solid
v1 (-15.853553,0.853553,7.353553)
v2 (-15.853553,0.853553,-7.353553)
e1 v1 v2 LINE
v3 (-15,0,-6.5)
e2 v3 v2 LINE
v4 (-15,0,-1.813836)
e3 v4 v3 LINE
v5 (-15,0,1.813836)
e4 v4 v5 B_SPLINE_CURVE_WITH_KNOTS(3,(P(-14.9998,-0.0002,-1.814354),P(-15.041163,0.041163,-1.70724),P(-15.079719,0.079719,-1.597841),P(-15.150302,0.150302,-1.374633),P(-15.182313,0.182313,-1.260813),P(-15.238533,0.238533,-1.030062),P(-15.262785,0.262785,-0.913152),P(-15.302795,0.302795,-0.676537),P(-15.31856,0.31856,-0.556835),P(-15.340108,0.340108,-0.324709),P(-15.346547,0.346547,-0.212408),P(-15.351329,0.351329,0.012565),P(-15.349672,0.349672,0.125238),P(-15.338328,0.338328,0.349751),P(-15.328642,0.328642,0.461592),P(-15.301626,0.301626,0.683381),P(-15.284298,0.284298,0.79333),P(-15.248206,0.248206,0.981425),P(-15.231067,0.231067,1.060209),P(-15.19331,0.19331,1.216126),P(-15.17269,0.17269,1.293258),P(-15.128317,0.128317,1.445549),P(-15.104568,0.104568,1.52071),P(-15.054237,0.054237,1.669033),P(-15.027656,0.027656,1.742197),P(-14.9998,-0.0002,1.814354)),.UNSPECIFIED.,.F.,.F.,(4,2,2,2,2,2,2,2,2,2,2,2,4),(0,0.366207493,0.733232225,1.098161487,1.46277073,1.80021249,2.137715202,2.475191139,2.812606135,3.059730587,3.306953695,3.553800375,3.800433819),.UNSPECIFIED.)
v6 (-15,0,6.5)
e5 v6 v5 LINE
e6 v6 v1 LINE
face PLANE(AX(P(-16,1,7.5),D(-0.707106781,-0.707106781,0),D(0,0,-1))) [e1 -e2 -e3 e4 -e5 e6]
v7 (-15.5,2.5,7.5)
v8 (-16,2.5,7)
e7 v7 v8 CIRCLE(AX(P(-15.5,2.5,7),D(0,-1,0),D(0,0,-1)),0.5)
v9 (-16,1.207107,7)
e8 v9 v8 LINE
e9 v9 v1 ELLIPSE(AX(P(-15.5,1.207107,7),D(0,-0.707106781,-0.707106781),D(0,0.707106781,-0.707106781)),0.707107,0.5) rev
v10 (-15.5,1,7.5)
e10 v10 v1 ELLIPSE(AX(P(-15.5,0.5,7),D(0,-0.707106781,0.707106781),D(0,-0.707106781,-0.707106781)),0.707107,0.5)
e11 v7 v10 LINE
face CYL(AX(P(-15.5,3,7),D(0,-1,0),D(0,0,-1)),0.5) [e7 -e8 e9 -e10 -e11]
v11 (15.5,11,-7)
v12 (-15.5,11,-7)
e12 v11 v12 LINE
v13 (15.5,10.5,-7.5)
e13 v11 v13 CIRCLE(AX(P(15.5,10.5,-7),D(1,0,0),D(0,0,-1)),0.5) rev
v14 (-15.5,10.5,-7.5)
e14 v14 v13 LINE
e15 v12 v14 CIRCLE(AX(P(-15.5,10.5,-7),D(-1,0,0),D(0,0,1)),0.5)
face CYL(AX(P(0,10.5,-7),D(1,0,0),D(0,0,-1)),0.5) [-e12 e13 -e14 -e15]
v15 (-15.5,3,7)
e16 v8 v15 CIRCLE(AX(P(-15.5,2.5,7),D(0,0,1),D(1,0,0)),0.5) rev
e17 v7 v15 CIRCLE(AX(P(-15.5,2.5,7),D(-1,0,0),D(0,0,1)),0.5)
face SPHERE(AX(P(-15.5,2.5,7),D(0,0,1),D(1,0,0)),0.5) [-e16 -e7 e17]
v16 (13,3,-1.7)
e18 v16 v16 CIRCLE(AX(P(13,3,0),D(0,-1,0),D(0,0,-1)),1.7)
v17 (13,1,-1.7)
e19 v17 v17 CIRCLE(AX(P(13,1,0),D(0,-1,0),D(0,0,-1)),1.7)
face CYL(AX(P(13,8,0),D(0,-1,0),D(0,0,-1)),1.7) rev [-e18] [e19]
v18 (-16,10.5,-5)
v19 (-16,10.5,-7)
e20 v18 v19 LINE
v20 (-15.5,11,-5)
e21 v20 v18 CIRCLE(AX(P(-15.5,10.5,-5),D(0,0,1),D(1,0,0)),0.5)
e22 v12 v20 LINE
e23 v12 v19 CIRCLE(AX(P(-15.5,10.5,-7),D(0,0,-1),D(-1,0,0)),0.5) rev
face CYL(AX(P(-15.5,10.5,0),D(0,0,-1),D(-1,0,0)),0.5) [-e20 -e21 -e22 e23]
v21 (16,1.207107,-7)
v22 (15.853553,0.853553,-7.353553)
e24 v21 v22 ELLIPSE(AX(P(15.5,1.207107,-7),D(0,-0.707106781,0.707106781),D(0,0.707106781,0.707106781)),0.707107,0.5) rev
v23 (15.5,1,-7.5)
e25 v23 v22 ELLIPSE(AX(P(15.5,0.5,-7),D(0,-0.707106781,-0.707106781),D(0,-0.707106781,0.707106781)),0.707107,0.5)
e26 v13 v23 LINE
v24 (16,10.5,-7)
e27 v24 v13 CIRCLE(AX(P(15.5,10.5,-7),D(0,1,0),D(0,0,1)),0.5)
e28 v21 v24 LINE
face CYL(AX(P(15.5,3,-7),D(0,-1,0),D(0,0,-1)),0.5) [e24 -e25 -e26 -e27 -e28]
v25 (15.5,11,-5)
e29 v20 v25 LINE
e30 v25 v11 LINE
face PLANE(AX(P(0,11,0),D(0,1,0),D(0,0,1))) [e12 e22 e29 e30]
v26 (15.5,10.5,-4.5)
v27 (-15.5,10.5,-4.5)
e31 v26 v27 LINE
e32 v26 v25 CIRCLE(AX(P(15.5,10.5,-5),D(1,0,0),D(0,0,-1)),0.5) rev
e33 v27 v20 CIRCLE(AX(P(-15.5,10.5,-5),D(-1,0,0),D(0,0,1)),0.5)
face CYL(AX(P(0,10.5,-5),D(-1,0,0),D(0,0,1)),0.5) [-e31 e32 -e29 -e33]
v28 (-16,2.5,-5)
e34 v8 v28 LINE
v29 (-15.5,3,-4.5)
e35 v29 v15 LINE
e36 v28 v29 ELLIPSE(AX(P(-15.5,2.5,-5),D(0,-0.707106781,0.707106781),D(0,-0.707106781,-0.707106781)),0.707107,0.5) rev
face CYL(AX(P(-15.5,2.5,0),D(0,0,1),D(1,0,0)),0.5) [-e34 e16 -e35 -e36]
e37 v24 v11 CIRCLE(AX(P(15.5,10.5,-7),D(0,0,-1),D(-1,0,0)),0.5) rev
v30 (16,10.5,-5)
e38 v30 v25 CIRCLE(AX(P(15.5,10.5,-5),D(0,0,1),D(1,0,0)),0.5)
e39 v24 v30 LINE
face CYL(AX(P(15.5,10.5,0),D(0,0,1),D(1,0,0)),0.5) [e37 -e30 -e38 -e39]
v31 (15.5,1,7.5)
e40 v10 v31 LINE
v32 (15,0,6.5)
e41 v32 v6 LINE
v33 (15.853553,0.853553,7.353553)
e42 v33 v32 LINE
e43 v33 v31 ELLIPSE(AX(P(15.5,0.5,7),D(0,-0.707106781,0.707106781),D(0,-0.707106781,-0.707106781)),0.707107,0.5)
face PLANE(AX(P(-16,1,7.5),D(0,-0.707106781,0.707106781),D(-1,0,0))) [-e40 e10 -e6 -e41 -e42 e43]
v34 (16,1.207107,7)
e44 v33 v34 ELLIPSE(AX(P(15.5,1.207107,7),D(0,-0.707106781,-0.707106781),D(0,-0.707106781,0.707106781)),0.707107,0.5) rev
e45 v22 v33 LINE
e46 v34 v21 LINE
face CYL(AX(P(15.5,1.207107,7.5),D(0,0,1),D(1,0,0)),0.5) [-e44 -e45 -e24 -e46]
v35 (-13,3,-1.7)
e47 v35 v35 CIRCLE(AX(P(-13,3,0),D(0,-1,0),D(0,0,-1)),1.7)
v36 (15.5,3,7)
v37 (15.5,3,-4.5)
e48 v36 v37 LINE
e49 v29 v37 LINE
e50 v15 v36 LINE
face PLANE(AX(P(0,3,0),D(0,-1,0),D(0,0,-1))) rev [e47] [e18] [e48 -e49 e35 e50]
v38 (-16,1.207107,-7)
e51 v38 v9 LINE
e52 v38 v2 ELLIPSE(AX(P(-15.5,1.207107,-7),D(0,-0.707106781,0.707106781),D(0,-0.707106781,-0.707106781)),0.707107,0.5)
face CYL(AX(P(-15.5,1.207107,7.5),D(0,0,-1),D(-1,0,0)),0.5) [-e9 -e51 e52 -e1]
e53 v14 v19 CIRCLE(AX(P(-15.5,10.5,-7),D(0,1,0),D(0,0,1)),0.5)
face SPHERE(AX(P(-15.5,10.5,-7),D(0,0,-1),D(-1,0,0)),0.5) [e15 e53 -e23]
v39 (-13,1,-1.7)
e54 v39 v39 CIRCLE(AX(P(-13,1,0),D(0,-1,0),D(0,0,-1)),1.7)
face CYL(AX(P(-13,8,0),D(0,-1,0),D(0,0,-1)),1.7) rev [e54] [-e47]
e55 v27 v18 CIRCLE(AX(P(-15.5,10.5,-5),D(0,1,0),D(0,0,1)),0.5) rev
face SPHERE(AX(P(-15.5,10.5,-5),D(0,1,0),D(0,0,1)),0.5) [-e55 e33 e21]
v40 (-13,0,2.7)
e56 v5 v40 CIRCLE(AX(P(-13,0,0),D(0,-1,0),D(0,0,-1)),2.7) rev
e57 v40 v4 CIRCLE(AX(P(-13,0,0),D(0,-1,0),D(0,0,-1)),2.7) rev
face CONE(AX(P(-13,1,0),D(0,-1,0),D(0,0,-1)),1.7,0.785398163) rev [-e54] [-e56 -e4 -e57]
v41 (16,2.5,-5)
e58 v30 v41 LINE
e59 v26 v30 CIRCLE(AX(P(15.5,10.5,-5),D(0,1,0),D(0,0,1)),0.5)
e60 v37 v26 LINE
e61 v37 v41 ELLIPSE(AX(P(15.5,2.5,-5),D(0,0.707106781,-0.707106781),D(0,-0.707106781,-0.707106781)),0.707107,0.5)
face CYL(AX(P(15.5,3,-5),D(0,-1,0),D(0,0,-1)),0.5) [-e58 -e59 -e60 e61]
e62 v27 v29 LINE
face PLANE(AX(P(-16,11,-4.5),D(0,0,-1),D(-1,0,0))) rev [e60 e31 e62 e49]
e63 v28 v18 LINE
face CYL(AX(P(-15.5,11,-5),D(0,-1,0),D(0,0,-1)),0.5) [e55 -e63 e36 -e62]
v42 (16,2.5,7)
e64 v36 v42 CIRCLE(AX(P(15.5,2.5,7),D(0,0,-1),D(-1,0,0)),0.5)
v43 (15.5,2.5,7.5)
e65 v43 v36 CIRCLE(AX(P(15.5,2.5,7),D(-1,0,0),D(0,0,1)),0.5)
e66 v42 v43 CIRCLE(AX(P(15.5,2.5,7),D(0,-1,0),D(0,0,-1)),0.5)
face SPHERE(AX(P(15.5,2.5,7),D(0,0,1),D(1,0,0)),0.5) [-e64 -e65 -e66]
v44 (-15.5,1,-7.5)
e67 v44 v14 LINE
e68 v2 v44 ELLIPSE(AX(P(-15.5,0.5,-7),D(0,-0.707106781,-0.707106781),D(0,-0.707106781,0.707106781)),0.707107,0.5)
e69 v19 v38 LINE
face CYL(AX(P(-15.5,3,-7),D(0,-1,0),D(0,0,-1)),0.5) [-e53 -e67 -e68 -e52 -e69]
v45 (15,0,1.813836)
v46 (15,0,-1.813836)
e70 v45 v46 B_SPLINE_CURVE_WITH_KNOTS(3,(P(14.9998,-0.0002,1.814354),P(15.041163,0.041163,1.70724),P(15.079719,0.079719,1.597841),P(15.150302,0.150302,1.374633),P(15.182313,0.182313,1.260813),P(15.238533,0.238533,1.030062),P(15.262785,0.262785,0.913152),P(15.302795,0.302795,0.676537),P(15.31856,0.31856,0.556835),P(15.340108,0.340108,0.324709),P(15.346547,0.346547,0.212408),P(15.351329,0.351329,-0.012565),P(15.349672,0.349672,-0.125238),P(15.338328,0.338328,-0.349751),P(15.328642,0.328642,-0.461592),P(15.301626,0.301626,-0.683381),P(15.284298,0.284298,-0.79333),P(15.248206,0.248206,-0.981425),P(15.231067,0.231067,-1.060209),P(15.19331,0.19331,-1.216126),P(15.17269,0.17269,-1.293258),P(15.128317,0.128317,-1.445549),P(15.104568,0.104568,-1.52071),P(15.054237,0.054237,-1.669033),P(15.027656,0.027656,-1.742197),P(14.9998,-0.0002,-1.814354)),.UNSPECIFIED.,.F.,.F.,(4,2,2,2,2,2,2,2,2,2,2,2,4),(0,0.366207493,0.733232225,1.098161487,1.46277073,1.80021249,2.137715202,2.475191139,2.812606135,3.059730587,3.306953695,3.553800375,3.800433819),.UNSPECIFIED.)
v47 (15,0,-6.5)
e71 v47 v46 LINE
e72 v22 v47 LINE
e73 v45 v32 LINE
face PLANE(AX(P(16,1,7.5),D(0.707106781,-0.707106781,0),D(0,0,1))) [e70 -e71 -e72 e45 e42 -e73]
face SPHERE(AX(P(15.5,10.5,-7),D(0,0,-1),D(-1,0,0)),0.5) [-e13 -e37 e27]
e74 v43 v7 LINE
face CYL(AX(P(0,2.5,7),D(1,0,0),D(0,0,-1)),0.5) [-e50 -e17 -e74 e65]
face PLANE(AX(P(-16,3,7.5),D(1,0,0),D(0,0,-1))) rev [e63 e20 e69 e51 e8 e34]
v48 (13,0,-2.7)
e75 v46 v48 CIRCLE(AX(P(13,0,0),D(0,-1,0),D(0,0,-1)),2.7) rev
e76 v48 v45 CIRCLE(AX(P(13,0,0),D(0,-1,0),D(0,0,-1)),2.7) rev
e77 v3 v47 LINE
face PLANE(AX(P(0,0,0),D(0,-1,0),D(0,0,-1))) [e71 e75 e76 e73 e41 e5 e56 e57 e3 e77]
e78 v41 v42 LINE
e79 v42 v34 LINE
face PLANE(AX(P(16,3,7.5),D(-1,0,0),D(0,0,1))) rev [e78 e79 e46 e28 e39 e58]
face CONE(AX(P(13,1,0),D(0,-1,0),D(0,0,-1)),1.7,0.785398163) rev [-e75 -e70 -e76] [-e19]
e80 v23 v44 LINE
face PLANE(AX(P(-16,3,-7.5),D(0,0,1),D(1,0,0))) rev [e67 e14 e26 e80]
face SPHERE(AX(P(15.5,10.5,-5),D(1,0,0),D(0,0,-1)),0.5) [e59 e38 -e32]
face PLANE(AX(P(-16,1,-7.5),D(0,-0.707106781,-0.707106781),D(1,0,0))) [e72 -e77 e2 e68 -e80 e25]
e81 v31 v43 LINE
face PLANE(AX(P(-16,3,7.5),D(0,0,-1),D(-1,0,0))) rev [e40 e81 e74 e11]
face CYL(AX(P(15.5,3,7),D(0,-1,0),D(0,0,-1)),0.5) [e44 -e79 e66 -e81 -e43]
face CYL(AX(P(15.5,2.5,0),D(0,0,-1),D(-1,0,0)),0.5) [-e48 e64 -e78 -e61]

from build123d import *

# Parameters (mm, degrees)
SKETCH_1_W          = 32
SKETCH_1_H          = 15
EXTRUDE_1_DEPTH     = 3
SKETCH_2_W          = 32
SKETCH_2_H          = 3
EXTRUDE_2_DEPTH     = 8
SKETCH_3_R          = 1.7
CUT_EXTRUDE_1_DEPTH = 8
CHAMFER_1_SIZE      = 1
FILLET_1_R          = 0.5
FILLET_2_R          = 0.5


with BuildPart() as part:
    # Эскиз1 → Бобышка-Вытянуть1 (new body)
    with BuildSketch(Plane(origin=(0, 0, 0), x_dir=(1, 0, 0), z_dir=(0, 1, 0))):
        Rectangle(SKETCH_1_W, SKETCH_1_H)
    extrude(amount=EXTRUDE_1_DEPTH)

    # Эскиз2 → Бобышка-Вытянуть2 (add)
    with BuildSketch(Plane(origin=(0, 3, 0), x_dir=(1, 0, 0), z_dir=(0, 1, 0))):
        with Locations((0, 6)):
            Rectangle(SKETCH_2_W, SKETCH_2_H)
    extrude(amount=EXTRUDE_2_DEPTH)

    # Эскиз3 → Вырез-Вытянуть1 (cut)
    with BuildSketch(Plane.XZ):
        with Locations(Location((13, 0, 0), (0, 0, 270))):
            Circle(SKETCH_3_R)
        with Locations(Location((-13, 0, 0), (0, 0, 270))):
            Circle(SKETCH_3_R)
    extrude(amount=-CUT_EXTRUDE_1_DEPTH, mode=Mode.SUBTRACT)

    # Фаска1
    # the kernel refuses this chamfer: 1 mm, written as the material it takes off along each edge
    with BuildSketch(Plane(origin=(13, 0, 0), x_dir=(0, 0, -1), z_dir=(-1, 0, 0))) as chamfer_1_piece_1:
        Polygon((1.7 + CHAMFER_1_SIZE, 0), (1.7, -CHAMFER_1_SIZE), (1.7, 0), align=None)
    revolve(axis=Axis((13, 0, 0), (0, -1, 0)), mode=Mode.SUBTRACT)
    with BuildSketch(Plane(origin=(-13, 0, 0), x_dir=(0, 0, -1), z_dir=(-1, 0, 0))) as chamfer_1_piece_2:
        Polygon((1.7 + CHAMFER_1_SIZE, 0), (1.7, -CHAMFER_1_SIZE), (1.7, 0), align=None)
    revolve(axis=Axis((-13, 0, 0), (0, -1, 0)), mode=Mode.SUBTRACT)
    with BuildSketch(Plane(origin=(-18.571682988, 0, 7.5), x_dir=(0, 0.9996219169112968, 0.027495876610586494), z_dir=(1, 0, 0))) as chamfer_1_piece_3:
        Polygon((CHAMFER_1_SIZE * 0.999621916911, -CHAMFER_1_SIZE * 0.0274958766106), (-CHAMFER_1_SIZE * 0.0274958766106, -CHAMFER_1_SIZE * 0.999621916911), (0, 0), align=None)
    extrude(amount=37.143365976, mode=Mode.SUBTRACT)
    with BuildSketch(Plane(origin=(-16, 0, -10.071682988), x_dir=(-0.02749587661058563, 0.9996219169112968, 0), z_dir=(0, 0, 1)), Plane(origin=(16, 0, 10.071682988), x_dir=(0.02749587661058563, 0.9996219169112968, 0), z_dir=(0, 0, -1))) as chamfer_1_piece_4:
        Polygon((CHAMFER_1_SIZE * 0.999621916911, -CHAMFER_1_SIZE * 0.0274958766106), (-CHAMFER_1_SIZE * 0.0274958766106, -CHAMFER_1_SIZE * 0.999621916911), (0, 0), align=None)
    extrude(amount=20.143365976, mode=Mode.SUBTRACT)
    with BuildSketch(Plane(origin=(18.571682988, 0, -7.5), x_dir=(0, -0.027495876610586365, 0.9996219169112968), z_dir=(-1, 0, 0))) as chamfer_1_piece_5:
        Polygon((CHAMFER_1_SIZE * 0.999621916911, CHAMFER_1_SIZE * 0.0274958766106), (-CHAMFER_1_SIZE * 0.0274958766106, CHAMFER_1_SIZE * 0.999621916911), (0, 0), align=None)
    extrude(amount=37.143365976, mode=Mode.SUBTRACT)

    # Скругление1
    # the kernel refuses this fillet: 0.5 mm, written as the material it takes off along each edge
    with BuildSketch(Plane(origin=(-15.5, 10.5, -5), x_dir=(0, 0, 1), z_dir=(0, 1, 0))) as fillet_1_piece_1_section:
        Polygon((0, 0), (FILLET_1_R, 0), (FILLET_1_R, -FILLET_1_R), (0, -FILLET_1_R), align=None)
    fillet_1_piece_1 = extrude(amount=FILLET_1_R, mode=Mode.PRIVATE)
    fillet_1_piece_1 = fillet_1_piece_1 - Plane(origin=(-15.5, 10.5, -5), x_dir=(0.7071067811865475, 0, -0.7071067811865475), z_dir=(0, 1, 0)) * Sphere(FILLET_1_R, mode=Mode.PRIVATE)
    add(fillet_1_piece_1, mode=Mode.SUBTRACT)
    with BuildSketch(Plane(origin=(15.5, 10.5, -5), x_dir=(1, 0, 0), z_dir=(0, 1, 0))) as fillet_1_piece_2_section:
        Polygon((0, 0), (FILLET_1_R, 0), (FILLET_1_R, -FILLET_1_R), (0, -FILLET_1_R), align=None)
    fillet_1_piece_2 = extrude(amount=FILLET_1_R, mode=Mode.PRIVATE)
    fillet_1_piece_2 = fillet_1_piece_2 - Plane(origin=(15.5, 10.5, -5), x_dir=(-0.7071067811865475, 0, -0.7071067811865475), z_dir=(0, 1, 0)) * Sphere(FILLET_1_R, mode=Mode.PRIVATE)
    add(fillet_1_piece_2, mode=Mode.SUBTRACT)
    with BuildSketch(Plane(origin=(-15.5, 10.5, -7), x_dir=(0, 1, 0), z_dir=(0, 0, -1))) as fillet_1_piece_3_section:
        Polygon((0, 0), (FILLET_1_R, 0), (FILLET_1_R, -FILLET_1_R), (0, -FILLET_1_R), align=None)
    fillet_1_piece_3 = extrude(amount=FILLET_1_R, mode=Mode.PRIVATE)
    fillet_1_piece_3 = fillet_1_piece_3 - Plane(origin=(-15.5, 10.5, -7), x_dir=(0.7071067811865475, -0.7071067811865475, 0), z_dir=(0, 0, -1)) * Sphere(FILLET_1_R, mode=Mode.PRIVATE)
    add(fillet_1_piece_3, mode=Mode.SUBTRACT)
    with BuildSketch(Plane(origin=(15.5, 10.5, -7), x_dir=(0, 1, 0), z_dir=(0, 0, -1))) as fillet_1_piece_4_section:
        Polygon((0, 0), (FILLET_1_R, 0), (FILLET_1_R, FILLET_1_R), (0, FILLET_1_R), align=None)
    fillet_1_piece_4 = extrude(amount=FILLET_1_R, mode=Mode.PRIVATE)
    fillet_1_piece_4 = fillet_1_piece_4 - Plane(origin=(15.5, 10.5, -7), x_dir=(-0.7071067811865475, -0.7071067811865475, 0), z_dir=(0, 0, -1)) * Sphere(FILLET_1_R, mode=Mode.PRIVATE)
    add(fillet_1_piece_4, mode=Mode.SUBTRACT)
    with BuildSketch(Plane(origin=(-16, 3, -4.5), x_dir=(1, 0, 0), z_dir=(0, 0, 1))) as fillet_1_piece_5:
        with BuildLine():
            CenterArc((FILLET_1_R, -FILLET_1_R), FILLET_1_R, 90, 90)
            Line((0, -FILLET_1_R), (0, 0))
            Line((0, 0), (FILLET_1_R, 0))
        make_face()
    extrude(amount=13.25, mode=Mode.SUBTRACT)
    with BuildSketch(Plane(origin=(-16, 3, -4.5), x_dir=(0, 0, -1), z_dir=(0, 1, 0))) as fillet_1_piece_6:
        with BuildLine():
            CenterArc((FILLET_1_R, -FILLET_1_R), FILLET_1_R, 90, 90)
            Line((0, -FILLET_1_R), (0, 0))
            Line((0, 0), (FILLET_1_R, 0))
        make_face()
    extrude(amount=7.5, mode=Mode.SUBTRACT)
    with BuildSketch(Plane(origin=(16, 3, -4.5), x_dir=(0, 0, -1), z_dir=(0, 1, 0))) as fillet_1_piece_7:
        with BuildLine():
            CenterArc((FILLET_1_R, FILLET_1_R), FILLET_1_R, 180, 90)
            Line((0, FILLET_1_R), (0, 0))
            Line((0, 0), (FILLET_1_R, 0))
        make_face()
    extrude(amount=7.5, mode=Mode.SUBTRACT)
    with BuildSketch(Plane(origin=(-16, 11, -5), x_dir=(0, -1, 0), z_dir=(0, 0, -1)), Plane(origin=(16, 11, -7), x_dir=(0, -1, 0), z_dir=(0, 0, 1))) as fillet_1_piece_8:
        with BuildLine():
            CenterArc((FILLET_1_R, -FILLET_1_R), FILLET_1_R, 90, 90)
            Line((0, -FILLET_1_R), (0, 0))
            Line((0, 0), (FILLET_1_R, 0))
        make_face()
    extrude(amount=2, mode=Mode.SUBTRACT)
    with BuildSketch(Plane(origin=(15.5, 11, -4.5), x_dir=(0, 0, -1), z_dir=(-1, 0, 0))) as fillet_1_piece_9:
        with BuildLine():
            CenterArc((FILLET_1_R, FILLET_1_R), FILLET_1_R, 180, 90)
            Line((0, FILLET_1_R), (0, 0))
            Line((0, 0), (FILLET_1_R, 0))
        make_face()
    extrude(amount=31, mode=Mode.SUBTRACT)
    with BuildSketch(Plane(origin=(-15.5, 11, -7.5), x_dir=(0, -1, 0), z_dir=(1, 0, 0))) as fillet_1_piece_10:
        with BuildLine():
            CenterArc((FILLET_1_R, -FILLET_1_R), FILLET_1_R, 90, 90)
            Line((0, -FILLET_1_R), (0, 0))
            Line((0, 0), (FILLET_1_R, 0))
        make_face()
    extrude(amount=31, mode=Mode.SUBTRACT)
    with BuildSketch(Plane(origin=(-16, 1, -8.017766953), x_dir=(0, 1, 0), z_dir=(0, 0, 1)), Plane(origin=(16, 1, 8.017766953), x_dir=(0, 1, 0), z_dir=(0, 0, -1))) as fillet_1_piece_11:
        with BuildLine():
            CenterArc((FILLET_1_R * 0.414213562373, -FILLET_1_R), FILLET_1_R, 90, 45)
            Line((-FILLET_1_R * 0.292893218814, -FILLET_1_R * 0.292893218814), (0, 0))
            Line((0, 0), (FILLET_1_R * 0.414213562373, 0))
        make_face()
    extrude(amount=16.035533906, mode=Mode.SUBTRACT)
    with BuildSketch(Plane(origin=(16, 3, 8.75), x_dir=(0, -1, 0), z_dir=(0, 0, -1))) as fillet_1_piece_12:
        with BuildLine():
            CenterArc((FILLET_1_R, FILLET_1_R), FILLET_1_R, 180, 90)
            Line((0, FILLET_1_R), (0, 0))
            Line((0, 0), (FILLET_1_R, 0))
        make_face()
    extrude(amount=13.25, mode=Mode.SUBTRACT)
    with BuildSketch(Plane(origin=(16, -0.25, 7.5), x_dir=(-1, 0, 0), z_dir=(0, 1, 0))) as fillet_1_piece_13:
        with BuildLine():
            CenterArc((FILLET_1_R, -FILLET_1_R), FILLET_1_R, 90, 90)
            Line((0, -FILLET_1_R), (0, 0))
            Line((0, 0), (FILLET_1_R, 0))
        make_face()
    extrude(amount=4.5, mode=Mode.SUBTRACT)
    with BuildSketch(Plane(origin=(-16, -0.25, 7.5), x_dir=(1, 0, 0), z_dir=(0, 1, 0))) as fillet_1_piece_14:
        with BuildLine():
            CenterArc((FILLET_1_R, FILLET_1_R), FILLET_1_R, 180, 90)
            Line((0, FILLET_1_R), (0, 0))
            Line((0, 0), (FILLET_1_R, 0))
        make_face()
    extrude(amount=4.5, mode=Mode.SUBTRACT)
    with BuildSketch(Plane(origin=(-16, 10.5, -7.5), x_dir=(0, 0, 1), z_dir=(0, -1, 0)), Plane(origin=(16, -0.25, -7.5), x_dir=(0, 0, 1), z_dir=(0, 1, 0))) as fillet_1_piece_15:
        with BuildLine():
            CenterArc((FILLET_1_R, -FILLET_1_R), FILLET_1_R, 90, 90)
            Line((0, -FILLET_1_R), (0, 0))
            Line((0, 0), (FILLET_1_R, 0))
        make_face()
    extrude(amount=10.75, mode=Mode.SUBTRACT)
    with BuildSketch(Plane(origin=(-16, 3, -5.75), x_dir=(1, 0, 0), z_dir=(0, 0, 1))) as fillet_1_piece_16a_section:
        with BuildLine():
            CenterArc((FILLET_1_R, -FILLET_1_R), FILLET_1_R, 90, 90)
            Line((0, -FILLET_1_R), (0, 0))
            Line((0, 0), (FILLET_1_R, 0))
        make_face()
    fillet_1_piece_16a = extrude(amount=14.5, mode=Mode.PRIVATE)
    fillet_1_piece_16a = split(fillet_1_piece_16a, bisect_by=Plane(origin=(-15.886802443, 2.886802443, -4.5), z_dir=(0, 0, -1)), keep=Keep.TOP, mode=Mode.PRIVATE)
    with BuildSketch(Plane(origin=(-16, 1.75, -4.5), x_dir=(0, 0, -1), z_dir=(0, 1, 0))) as fillet_1_piece_16b_section:
        with BuildLine():
            CenterArc((FILLET_1_R, -FILLET_1_R), FILLET_1_R, 90, 90)
            Line((0, -FILLET_1_R), (0, 0))
            Line((0, 0), (FILLET_1_R, 0))
        make_face()
    fillet_1_piece_16b = extrude(amount=8.75, mode=Mode.PRIVATE)
    fillet_1_piece_16b = split(fillet_1_piece_16b, bisect_by=Plane(origin=(-15.886802443, 3, -4.613197557), z_dir=(0, -1, 0)), keep=Keep.TOP, mode=Mode.PRIVATE)
    fillet_1_piece_16 = fillet_1_piece_16a & fillet_1_piece_16b
    add(fillet_1_piece_16, mode=Mode.SUBTRACT)
    with BuildSketch(Plane(origin=(16, 1.75, -4.5), x_dir=(0, 0, -1), z_dir=(0, 1, 0))) as fillet_1_piece_17a_section:
        with BuildLine():
            CenterArc((FILLET_1_R, FILLET_1_R), FILLET_1_R, 180, 90)
            Line((0, FILLET_1_R), (0, 0))
            Line((0, 0), (FILLET_1_R, 0))
        make_face()
    fillet_1_piece_17a = extrude(amount=8.75, mode=Mode.PRIVATE)
    fillet_1_piece_17a = split(fillet_1_piece_17a, bisect_by=Plane(origin=(15.886802443, 3, -4.613197557), z_dir=(0, -1, 0)), keep=Keep.TOP, mode=Mode.PRIVATE)
    with BuildSketch(Plane(origin=(16, 3, 8.75), x_dir=(0, -1, 0), z_dir=(0, 0, -1))) as fillet_1_piece_17b_section:
        with BuildLine():
            CenterArc((FILLET_1_R, FILLET_1_R), FILLET_1_R, 180, 90)
            Line((0, FILLET_1_R), (0, 0))
            Line((0, 0), (FILLET_1_R, 0))
        make_face()
    fillet_1_piece_17b = extrude(amount=14.5, mode=Mode.PRIVATE)
    fillet_1_piece_17b = split(fillet_1_piece_17b, bisect_by=Plane(origin=(15.886802443, 2.886802443, -4.5), z_dir=(0, 0, -1)), keep=Keep.TOP, mode=Mode.PRIVATE)
    fillet_1_piece_17 = fillet_1_piece_17a & fillet_1_piece_17b
    add(fillet_1_piece_17, mode=Mode.SUBTRACT)

    # Скругление2
    # the kernel refuses this fillet: 0.5 mm, written as the material it takes off along each edge
    with BuildSketch(Plane(origin=(-15.5, 2.5, 7), x_dir=(0, 1, 0), z_dir=(0, 0, 1))) as fillet_2_piece_1_section:
        Polygon((0, 0), (FILLET_2_R, 0), (FILLET_2_R, FILLET_2_R), (0, FILLET_2_R), align=None)
    fillet_2_piece_1 = extrude(amount=FILLET_2_R, mode=Mode.PRIVATE)
    fillet_2_piece_1 = fillet_2_piece_1 - Plane(origin=(-15.5, 2.5, 7), x_dir=(0.7071067811865475, -0.7071067811865475, 0), z_dir=(0, 0, 1)) * Sphere(FILLET_2_R, mode=Mode.PRIVATE)
    add(fillet_2_piece_1, mode=Mode.SUBTRACT)
    with BuildSketch(Plane(origin=(15.5, 2.5, 7), x_dir=(0, 1, 0), z_dir=(0, 0, 1))) as fillet_2_piece_2_section:
        Polygon((0, 0), (FILLET_2_R, 0), (FILLET_2_R, -FILLET_2_R), (0, -FILLET_2_R), align=None)
    fillet_2_piece_2 = extrude(amount=FILLET_2_R, mode=Mode.PRIVATE)
    fillet_2_piece_2 = fillet_2_piece_2 - Plane(origin=(15.5, 2.5, 7), x_dir=(-0.7071067811865475, -0.7071067811865475, 0), z_dir=(0, 0, 1)) * Sphere(FILLET_2_R, mode=Mode.PRIVATE)
    add(fillet_2_piece_2, mode=Mode.SUBTRACT)
    with BuildSketch(Plane(origin=(-15.5, 3, 7.5), x_dir=(0, -1, 0), z_dir=(1, 0, 0))) as fillet_2_piece_3:
        with BuildLine():
            CenterArc((FILLET_2_R, FILLET_2_R), FILLET_2_R, 180, 90)
            Line((0, FILLET_2_R), (0, 0))
            Line((0, 0), (FILLET_2_R, 0))
        make_face()
    extrude(amount=31, mode=Mode.SUBTRACT)


solid = part.part
